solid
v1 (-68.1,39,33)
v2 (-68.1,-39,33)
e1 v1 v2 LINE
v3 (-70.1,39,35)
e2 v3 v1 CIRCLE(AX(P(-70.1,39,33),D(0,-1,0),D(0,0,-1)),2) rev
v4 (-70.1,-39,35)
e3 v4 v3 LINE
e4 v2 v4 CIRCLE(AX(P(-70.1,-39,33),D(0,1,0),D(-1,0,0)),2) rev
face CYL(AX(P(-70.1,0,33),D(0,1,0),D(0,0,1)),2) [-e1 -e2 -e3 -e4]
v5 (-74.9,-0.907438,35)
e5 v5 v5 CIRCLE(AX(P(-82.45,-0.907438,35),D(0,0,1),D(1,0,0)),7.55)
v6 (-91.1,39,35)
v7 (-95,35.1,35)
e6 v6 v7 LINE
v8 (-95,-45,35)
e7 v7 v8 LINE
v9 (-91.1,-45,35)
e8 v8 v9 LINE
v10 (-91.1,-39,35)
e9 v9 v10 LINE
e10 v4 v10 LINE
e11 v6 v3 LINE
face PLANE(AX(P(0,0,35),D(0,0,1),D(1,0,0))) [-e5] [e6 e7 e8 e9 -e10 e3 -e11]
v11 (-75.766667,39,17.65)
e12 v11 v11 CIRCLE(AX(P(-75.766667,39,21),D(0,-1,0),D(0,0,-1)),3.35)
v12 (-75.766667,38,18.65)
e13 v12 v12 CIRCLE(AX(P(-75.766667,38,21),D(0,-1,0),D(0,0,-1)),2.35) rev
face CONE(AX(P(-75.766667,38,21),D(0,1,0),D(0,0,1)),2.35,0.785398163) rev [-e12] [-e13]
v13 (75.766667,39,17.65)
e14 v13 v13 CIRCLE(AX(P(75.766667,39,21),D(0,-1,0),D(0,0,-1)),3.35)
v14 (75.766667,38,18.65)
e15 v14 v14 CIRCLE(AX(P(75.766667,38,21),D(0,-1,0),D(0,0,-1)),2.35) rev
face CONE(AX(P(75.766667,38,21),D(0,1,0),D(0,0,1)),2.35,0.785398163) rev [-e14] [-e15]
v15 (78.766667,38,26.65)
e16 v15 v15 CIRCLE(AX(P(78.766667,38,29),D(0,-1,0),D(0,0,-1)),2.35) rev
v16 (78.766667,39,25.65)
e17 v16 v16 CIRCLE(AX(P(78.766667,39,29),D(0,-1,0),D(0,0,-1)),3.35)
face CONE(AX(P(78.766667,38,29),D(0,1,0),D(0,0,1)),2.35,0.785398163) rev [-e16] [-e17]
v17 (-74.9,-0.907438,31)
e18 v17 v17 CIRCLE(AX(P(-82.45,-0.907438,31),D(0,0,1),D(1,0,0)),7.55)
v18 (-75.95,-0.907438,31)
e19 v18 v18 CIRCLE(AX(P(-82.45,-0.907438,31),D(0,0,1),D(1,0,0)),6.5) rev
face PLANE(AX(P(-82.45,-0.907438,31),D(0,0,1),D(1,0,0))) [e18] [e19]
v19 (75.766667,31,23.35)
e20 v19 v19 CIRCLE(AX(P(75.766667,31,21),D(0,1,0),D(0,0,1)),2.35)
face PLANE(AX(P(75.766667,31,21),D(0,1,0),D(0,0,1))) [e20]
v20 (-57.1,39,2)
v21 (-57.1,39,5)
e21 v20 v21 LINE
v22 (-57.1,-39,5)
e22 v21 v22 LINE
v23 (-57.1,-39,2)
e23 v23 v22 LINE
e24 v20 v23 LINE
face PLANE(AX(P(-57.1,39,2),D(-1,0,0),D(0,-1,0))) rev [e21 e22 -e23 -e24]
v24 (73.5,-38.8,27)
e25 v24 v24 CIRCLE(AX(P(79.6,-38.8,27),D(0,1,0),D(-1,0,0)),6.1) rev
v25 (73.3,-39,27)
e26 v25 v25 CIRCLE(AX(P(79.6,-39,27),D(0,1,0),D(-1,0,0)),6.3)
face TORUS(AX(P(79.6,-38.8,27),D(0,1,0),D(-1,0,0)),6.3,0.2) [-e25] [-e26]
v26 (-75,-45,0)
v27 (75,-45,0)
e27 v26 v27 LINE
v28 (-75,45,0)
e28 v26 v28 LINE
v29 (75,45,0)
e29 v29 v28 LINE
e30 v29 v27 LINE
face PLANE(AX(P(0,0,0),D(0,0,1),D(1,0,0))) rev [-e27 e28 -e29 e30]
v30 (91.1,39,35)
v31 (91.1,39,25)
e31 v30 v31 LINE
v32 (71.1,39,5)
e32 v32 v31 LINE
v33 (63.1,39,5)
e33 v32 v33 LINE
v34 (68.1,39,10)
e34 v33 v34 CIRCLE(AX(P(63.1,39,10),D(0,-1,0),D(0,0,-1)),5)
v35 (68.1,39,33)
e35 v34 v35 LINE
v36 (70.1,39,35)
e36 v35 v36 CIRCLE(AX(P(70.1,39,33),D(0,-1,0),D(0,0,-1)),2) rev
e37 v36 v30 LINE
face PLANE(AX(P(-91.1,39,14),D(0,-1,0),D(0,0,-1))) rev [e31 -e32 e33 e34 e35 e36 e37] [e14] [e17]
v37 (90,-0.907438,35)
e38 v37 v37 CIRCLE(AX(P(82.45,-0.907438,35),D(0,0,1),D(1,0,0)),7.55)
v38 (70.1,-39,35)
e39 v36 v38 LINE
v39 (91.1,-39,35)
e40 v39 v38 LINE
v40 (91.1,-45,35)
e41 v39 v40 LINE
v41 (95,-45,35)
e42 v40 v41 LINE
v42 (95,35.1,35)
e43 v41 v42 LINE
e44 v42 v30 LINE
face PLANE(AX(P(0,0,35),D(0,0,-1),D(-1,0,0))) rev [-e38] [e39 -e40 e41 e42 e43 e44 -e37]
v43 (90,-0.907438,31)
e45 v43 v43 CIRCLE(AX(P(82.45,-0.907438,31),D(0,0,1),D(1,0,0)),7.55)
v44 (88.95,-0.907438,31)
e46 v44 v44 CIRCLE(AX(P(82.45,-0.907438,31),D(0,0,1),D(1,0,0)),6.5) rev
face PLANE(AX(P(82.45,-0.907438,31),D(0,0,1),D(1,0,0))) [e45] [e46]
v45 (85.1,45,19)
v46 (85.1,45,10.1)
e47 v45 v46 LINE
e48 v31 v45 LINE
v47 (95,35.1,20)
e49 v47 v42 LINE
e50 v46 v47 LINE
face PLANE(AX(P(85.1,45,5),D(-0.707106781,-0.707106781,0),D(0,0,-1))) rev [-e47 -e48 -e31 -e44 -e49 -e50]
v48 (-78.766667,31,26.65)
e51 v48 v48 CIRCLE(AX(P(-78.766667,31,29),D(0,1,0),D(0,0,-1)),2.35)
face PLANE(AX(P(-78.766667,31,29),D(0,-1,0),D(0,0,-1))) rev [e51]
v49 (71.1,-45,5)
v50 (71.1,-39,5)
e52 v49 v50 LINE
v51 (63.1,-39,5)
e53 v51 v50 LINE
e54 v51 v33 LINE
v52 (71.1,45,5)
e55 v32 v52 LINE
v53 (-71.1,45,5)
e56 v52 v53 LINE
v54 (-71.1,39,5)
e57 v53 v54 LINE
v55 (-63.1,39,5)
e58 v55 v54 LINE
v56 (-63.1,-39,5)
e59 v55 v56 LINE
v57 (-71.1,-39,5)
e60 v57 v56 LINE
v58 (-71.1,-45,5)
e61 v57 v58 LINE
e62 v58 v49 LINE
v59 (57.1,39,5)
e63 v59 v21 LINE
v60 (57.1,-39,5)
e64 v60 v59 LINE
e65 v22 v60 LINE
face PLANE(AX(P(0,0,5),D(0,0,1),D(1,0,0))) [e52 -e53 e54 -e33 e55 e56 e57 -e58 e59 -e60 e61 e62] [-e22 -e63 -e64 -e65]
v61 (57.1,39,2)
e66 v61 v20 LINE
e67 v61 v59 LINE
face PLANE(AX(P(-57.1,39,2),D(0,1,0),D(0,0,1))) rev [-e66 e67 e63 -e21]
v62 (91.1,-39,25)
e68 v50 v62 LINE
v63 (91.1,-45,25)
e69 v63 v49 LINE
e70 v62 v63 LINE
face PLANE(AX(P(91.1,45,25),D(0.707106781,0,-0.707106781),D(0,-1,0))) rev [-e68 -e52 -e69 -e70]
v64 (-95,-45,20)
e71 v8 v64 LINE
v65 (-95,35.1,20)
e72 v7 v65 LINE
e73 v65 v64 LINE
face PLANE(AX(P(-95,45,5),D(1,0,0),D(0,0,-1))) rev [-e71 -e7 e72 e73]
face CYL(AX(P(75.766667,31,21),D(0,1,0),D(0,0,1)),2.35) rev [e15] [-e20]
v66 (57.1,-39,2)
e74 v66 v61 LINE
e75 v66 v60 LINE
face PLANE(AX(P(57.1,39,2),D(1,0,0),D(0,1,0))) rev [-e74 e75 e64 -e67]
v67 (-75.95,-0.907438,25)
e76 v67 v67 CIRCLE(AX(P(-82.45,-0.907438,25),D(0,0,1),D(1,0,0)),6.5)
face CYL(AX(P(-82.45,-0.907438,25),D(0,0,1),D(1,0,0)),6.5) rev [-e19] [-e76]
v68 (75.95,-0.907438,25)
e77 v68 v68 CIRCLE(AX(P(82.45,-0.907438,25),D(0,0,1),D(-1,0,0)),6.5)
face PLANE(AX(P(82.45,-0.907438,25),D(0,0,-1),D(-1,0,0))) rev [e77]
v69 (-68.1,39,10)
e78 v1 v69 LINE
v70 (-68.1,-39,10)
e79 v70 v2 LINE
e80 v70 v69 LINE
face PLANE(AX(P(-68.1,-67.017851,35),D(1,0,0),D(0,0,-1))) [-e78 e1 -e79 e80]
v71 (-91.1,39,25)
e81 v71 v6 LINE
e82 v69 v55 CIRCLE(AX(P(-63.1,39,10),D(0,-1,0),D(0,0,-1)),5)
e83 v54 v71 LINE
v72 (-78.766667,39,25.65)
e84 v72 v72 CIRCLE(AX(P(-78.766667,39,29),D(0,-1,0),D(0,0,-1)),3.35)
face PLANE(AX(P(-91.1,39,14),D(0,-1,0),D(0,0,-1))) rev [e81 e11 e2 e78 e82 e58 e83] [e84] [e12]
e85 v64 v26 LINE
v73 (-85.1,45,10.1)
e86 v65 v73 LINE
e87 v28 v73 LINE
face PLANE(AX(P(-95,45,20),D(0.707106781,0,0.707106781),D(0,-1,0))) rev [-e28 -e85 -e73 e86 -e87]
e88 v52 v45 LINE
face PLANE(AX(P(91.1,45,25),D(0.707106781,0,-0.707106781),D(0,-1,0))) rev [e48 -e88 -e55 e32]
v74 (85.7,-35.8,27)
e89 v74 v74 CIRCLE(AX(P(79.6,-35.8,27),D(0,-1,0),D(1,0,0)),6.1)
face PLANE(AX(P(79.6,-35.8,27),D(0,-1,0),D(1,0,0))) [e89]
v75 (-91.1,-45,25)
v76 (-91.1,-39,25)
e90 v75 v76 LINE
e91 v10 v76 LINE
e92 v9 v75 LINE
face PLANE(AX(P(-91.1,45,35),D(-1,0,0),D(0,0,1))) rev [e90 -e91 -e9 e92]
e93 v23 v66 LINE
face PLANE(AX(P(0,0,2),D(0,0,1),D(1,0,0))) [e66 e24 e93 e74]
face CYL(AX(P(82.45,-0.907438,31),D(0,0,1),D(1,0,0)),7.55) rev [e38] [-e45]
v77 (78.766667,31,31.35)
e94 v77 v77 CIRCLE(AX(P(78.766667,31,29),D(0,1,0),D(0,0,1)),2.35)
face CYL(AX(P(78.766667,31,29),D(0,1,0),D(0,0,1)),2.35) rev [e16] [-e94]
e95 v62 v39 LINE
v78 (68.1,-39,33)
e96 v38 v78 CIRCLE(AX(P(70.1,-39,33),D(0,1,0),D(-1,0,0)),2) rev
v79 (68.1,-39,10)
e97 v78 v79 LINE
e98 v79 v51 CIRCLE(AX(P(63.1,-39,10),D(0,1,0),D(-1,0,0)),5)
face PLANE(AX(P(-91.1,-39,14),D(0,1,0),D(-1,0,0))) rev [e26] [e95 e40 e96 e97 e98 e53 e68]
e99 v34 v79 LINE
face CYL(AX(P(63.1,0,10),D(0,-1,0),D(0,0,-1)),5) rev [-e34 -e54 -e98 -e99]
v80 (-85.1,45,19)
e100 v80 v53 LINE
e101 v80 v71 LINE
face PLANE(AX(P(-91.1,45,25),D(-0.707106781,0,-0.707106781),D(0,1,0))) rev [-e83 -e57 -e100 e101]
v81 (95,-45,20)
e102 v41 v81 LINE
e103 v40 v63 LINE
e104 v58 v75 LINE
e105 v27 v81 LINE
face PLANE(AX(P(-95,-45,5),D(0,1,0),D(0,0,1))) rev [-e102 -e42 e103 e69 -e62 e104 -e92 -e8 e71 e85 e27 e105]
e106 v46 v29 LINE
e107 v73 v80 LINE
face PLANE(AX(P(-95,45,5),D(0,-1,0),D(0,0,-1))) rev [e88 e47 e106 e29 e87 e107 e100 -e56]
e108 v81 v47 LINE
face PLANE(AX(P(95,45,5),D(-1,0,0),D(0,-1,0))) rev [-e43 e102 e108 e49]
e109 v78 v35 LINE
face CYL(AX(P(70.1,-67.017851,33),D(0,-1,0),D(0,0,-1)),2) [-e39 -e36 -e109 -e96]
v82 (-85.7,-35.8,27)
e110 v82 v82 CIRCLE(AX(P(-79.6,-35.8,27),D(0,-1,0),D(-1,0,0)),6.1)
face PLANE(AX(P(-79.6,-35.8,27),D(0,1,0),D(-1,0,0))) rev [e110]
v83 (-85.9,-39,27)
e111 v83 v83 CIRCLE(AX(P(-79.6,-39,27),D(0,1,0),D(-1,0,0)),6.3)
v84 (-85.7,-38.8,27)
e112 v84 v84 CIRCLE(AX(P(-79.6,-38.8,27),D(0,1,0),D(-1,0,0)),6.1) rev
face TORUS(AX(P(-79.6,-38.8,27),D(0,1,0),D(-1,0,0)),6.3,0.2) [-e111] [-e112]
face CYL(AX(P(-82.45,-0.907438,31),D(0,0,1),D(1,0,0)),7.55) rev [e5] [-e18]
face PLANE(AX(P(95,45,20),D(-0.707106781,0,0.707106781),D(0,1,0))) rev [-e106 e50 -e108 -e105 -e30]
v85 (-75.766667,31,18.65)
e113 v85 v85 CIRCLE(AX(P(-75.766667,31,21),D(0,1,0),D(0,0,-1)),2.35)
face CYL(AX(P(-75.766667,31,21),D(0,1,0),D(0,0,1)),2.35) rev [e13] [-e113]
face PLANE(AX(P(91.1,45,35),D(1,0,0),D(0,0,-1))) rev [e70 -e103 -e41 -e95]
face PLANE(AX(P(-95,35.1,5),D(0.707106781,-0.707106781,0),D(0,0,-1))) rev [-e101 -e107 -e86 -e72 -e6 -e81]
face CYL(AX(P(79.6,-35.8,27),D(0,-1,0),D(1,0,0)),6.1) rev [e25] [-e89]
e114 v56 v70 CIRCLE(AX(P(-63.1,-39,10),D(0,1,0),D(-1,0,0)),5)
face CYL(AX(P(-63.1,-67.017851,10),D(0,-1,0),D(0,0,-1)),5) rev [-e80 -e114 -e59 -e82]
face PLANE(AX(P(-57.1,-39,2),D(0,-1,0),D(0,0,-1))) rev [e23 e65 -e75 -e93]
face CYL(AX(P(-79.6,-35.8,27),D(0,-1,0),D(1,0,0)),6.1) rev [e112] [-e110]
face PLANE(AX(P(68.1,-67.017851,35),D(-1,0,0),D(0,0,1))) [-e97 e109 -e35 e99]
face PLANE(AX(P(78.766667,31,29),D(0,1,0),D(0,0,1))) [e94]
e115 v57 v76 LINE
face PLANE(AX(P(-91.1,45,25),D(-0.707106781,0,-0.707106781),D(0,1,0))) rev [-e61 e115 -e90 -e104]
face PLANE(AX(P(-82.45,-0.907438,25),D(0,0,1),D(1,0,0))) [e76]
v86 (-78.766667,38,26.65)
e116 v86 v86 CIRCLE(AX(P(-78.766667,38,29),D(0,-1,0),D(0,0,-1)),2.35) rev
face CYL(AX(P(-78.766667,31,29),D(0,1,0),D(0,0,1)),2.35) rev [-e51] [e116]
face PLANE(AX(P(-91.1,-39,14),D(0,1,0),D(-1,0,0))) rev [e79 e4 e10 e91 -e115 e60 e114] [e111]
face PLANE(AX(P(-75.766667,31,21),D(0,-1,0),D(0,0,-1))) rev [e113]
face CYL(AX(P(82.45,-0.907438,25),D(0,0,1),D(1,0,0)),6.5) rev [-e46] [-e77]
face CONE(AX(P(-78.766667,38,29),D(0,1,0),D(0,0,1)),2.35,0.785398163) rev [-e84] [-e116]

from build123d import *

# Parameters (mm, degrees)
SKETCH1_W                      = 190
SKETCH1_H                      = 90
BOSS_EXTRUDE1_DEPTH            = 5
SKETCH2_W                      = 3.9
SKETCH2_H                      = 90
BOSS_EXTRUDE2_DEPTH            = 30
SKETCH3_W                      = 34
SKETCH3_H                      = 5
SKETCH3_W_2                    = 47
BOSS_EXTRUDE3_DEPTH            = 90
SKETCH4_W                      = 182.2
SKETCH4_H                      = 6
CUT_EXTRUDE1_DEPTH             = 5
CHAMFER6_SIZE                  = 20
BOSS_EXTRUDE4_DEPTH            = 78
FILLET5_R                      = 2
SKETCH9_R                      = 6.5
CUT_EXTRUDE4_DEPTH             = 10
SKETCH10_R                     = 7.55
CUT_EXTRUDE5_DEPTH             = 4
SKETCH15_R                     = 2.35
CUT_EXTRUDE7_DEPTH             = 8
CHAMFER7_SIZE                  = 1
SKETCH17_R                     = 6.1
CUT_EXTRUDE8_DEPTH             = 3.2
FILLET7_R                      = 0.2
CHAMFER8_SIZE                  = 9.9
CUT_EXTRUDE9_REACH             = 164.433
SKETCH18_W                     = 5
SKETCH18_H                     = 78
CUT_EXTRUDE9_DIRECTION_2_REACH = 164.433
BOSS_EXTRUDE5_DEPTH            = 78
FILLET8_R                      = 5
SKETCH21_W                     = 114.2
SKETCH21_H                     = 78
CUT_EXTRUDE10_DEPTH            = 3


with BuildPart() as part:
    # Sketch1 → Boss-Extrude1 (new body)
    with BuildSketch(Plane.XY):
        Rectangle(SKETCH1_W, SKETCH1_H)
    extrude(amount=BOSS_EXTRUDE1_DEPTH)

    # Sketch2 → Boss-Extrude2 (add)
    with BuildSketch(Plane.XY.offset(5)):
        with Locations((-93.05, 0)):
            Rectangle(SKETCH2_W, SKETCH2_H)
        with Locations((93.05, 0)):
            Rectangle(SKETCH2_W, SKETCH2_H)
    extrude(amount=BOSS_EXTRUDE2_DEPTH)

    # Sketch3 → Boss-Extrude3 (add)
    with BuildSketch(Plane(origin=(0, 45, 0), x_dir=(1, 0, 0), z_dir=(0, 1, 0))):
        with Locations((-74.1, -16.5)):
            Rectangle(SKETCH3_W, SKETCH3_H)
        with Locations((67.6, -16.5)):
            Rectangle(SKETCH3_W_2, SKETCH3_H)
    extrude(amount=-BOSS_EXTRUDE3_DEPTH)

    # Sketch4 → Cut-Extrude1 (cut)
    with BuildSketch(Plane.XY.offset(19)):
        with Locations((0, 42)):
            Rectangle(SKETCH4_W, SKETCH4_H)
        with Locations((0, -42)):
            Rectangle(SKETCH4_W, SKETCH4_H)
    extrude(amount=-CUT_EXTRUDE1_DEPTH, mode=Mode.SUBTRACT)

    # Chamfer6
    # the kernel refuses this chamfer: 20 mm, written as the material it adds along each edge
    with BuildSketch(Plane(origin=(-91.1, 45, 5), x_dir=(0.9996219169112968, 0, -0.02749587661058636), z_dir=(0, -1, 0))) as chamfer6_piece_1:
        Polygon((CHAMFER6_SIZE * 0.999621916911, CHAMFER6_SIZE * 0.0274958766106), (-CHAMFER6_SIZE * 0.0274958766106, CHAMFER6_SIZE * 0.999621916911), (0, 0), align=None)
    extrude(amount=90)
    with BuildSketch(Plane(origin=(91.1, -45, 5), x_dir=(0.027495876610586317, 0, 0.9996219169112968), z_dir=(0, 1, 0))) as chamfer6_piece_2:
        Polygon((CHAMFER6_SIZE * 0.999621916911, -CHAMFER6_SIZE * 0.0274958766106), (-CHAMFER6_SIZE * 0.0274958766106, -CHAMFER6_SIZE * 0.999621916911), (0, 0), align=None)
    extrude(amount=90)
    # the kernel refuses this chamfer: 20 mm, written as the material it takes off along each edge
    with BuildSketch(Plane(origin=(-95, -96.433659759, 0), x_dir=(0.9996219169112968, 0, -0.027495876610586372), z_dir=(0, 1, 0)), Plane(origin=(95, 96.433659759, 0), x_dir=(-0.9996219169112968, 0, -0.027495876610586372), z_dir=(0, -1, 0))) as chamfer6_2_piece_1:
        Polygon((CHAMFER6_SIZE * 0.999621916911, -CHAMFER6_SIZE * 0.0274958766106), (-CHAMFER6_SIZE * 0.0274958766106, -CHAMFER6_SIZE * 0.999621916911), (0, 0), align=None)
    extrude(amount=192.867319519, mode=Mode.SUBTRACT)

    # Sketch7 → Boss-Extrude4 (add)
    with BuildSketch(Plane(origin=(0, 39, 0), x_dir=(1, 0, 0), z_dir=(0, 1, 0))):
        Polygon((-85.1, -19), (-91.1, -25), (-91.1, -35), (-68.1, -35), (-68.1, -19), align=None)
        Polygon((68.1, -35), (68.1, -19), (85.1, -19), (91.1, -25), (91.1, -35), align=None)
    extrude(amount=-BOSS_EXTRUDE4_DEPTH)

    # Fillet5
    fillet5_edges = [part.edges().sort_by_distance(p)[0] for p in [
        (-68.1, 0, 35),
        (68.1, 0, 35),
    ]]
    fillet(fillet5_edges, radius=FILLET5_R)

    # Sketch9 → Cut-Extrude4 (cut)
    with BuildSketch(Plane.XY.offset(35)):
        with Locations((-82.45, -0.90743758)):
            Circle(SKETCH9_R)
        with Locations(Location((82.45, -0.90743758, 0), (0, 0, 180))):
            Circle(SKETCH9_R)
    extrude(amount=-CUT_EXTRUDE4_DEPTH, mode=Mode.SUBTRACT)

    # Sketch10 → Cut-Extrude5 (cut)
    with BuildSketch(Plane.XY.offset(35)):
        with Locations((-82.45, -0.90743758)):
            Circle(SKETCH10_R)
        with Locations((82.45, -0.90743758)):
            Circle(SKETCH10_R)
    extrude(amount=-CUT_EXTRUDE5_DEPTH, mode=Mode.SUBTRACT)

    # Sketch15 → Cut-Extrude7 (cut)
    with BuildSketch(Plane(origin=(0, 39, 0), x_dir=(1, 0, 0), z_dir=(0, 1, 0))):
        with Locations(Location((75.766666667, -21, 0), (0, 0, 270))):
            Circle(SKETCH15_R)
        with Locations(Location((-75.766666667, -21, 0), (0, 0, 90))):
            Circle(SKETCH15_R)
        with Locations(Location((78.766666667, -29, 0), (0, 0, 270))):
            Circle(SKETCH15_R)
        with Locations(Location((-78.766666667, -29, 0), (0, 0, 90))):
            Circle(SKETCH15_R)
    extrude(amount=-CUT_EXTRUDE7_DEPTH, mode=Mode.SUBTRACT)

    # Chamfer7
    chamfer7_edges = [part.edges().sort_by_distance(p)[0] for p in [
        (-75.766666667, 39, 23.35),
        (78.766666667, 39, 26.65),
        (-78.766666667, 39, 31.35),
        (75.766666667, 39, 18.65),
    ]]
    chamfer(chamfer7_edges, length=CHAMFER7_SIZE)

    # Sketch17 → Cut-Extrude8 (cut)
    with BuildSketch(Plane.XZ.offset(39)):
        with Locations((79.6, 27)):
            Circle(SKETCH17_R)
        with Locations(Location((-79.6, 27, 0), (0, 0, 180))):
            Circle(SKETCH17_R)
    extrude(amount=-CUT_EXTRUDE8_DEPTH, mode=Mode.SUBTRACT)

    # Fillet7
    fillet7_edges = [part.edges().sort_by_distance(p)[0] for p in [
        (73.5, -39, 27),
        (-73.5, -39, 27),
    ]]
    fillet(fillet7_edges, radius=FILLET7_R)

    # Chamfer8
    # the kernel refuses this chamfer: 9.9 mm, written as the material it takes off along each edge
    with BuildSketch(Plane(origin=(-95, 45, -5.459661581), x_dir=(0.9996219169112968, 0.027495876610586265, 0), z_dir=(0, 0, 1)), Plane(origin=(95, 45, 60.459661581), x_dir=(-0.9996219169112968, 0.02749587661058615, 0), z_dir=(0, 0, -1))) as chamfer8_piece_1:
        Polygon((CHAMFER8_SIZE * 0.999621916911, -CHAMFER8_SIZE * 0.0274958766106), (-CHAMFER8_SIZE * 0.0274958766106, -CHAMFER8_SIZE * 0.999621916911), (0, 0), align=None)
    extrude(amount=65.919323162, mode=Mode.SUBTRACT)

    # Cut-Extrude9: up to this face of the body (flat: up to its plane)
    cut_extrude9_end = Plane(part.part.faces().sort_by_distance((-68.1, 0, 26))[0])
    # Sketch18 → Cut-Extrude9 (cut, up to the picked face)
    with BuildSketch(Plane(origin=(-57.1, 0, 0), x_dir=(0, 0, -1), z_dir=(1, 0, 0)), mode=Mode.PRIVATE) as cut_extrude9_sk1:
        with Locations((-16.5, 0)):
            Rectangle(SKETCH18_W, SKETCH18_H)
    cut_extrude9_tool1 = split(extrude(cut_extrude9_sk1.sketch, amount=-CUT_EXTRUDE9_REACH, mode=Mode.PRIVATE), bisect_by=cut_extrude9_end, keep=Keep.BOTH, mode=Mode.PRIVATE)
    add(cut_extrude9_tool1.solids().sort_by(Axis((-57.1, 0, 16.5), (-1, 0, 0)))[0], mode=Mode.SUBTRACT)

    # Cut-Extrude9 direction 2: up to this face of the body (flat: up to its plane)
    cut_extrude9_direction_2_end = Plane(part.part.faces().sort_by_distance((68.1, 0, 26))[0])
    # Sketch18 → Cut-Extrude9 direction 2 (cut, up to the picked face)
    with BuildSketch(Plane(origin=(-57.1, 0, 0), x_dir=(0, 0, -1), z_dir=(1, 0, 0)), mode=Mode.PRIVATE) as cut_extrude9_direction_2_sk1:
        with Locations((-16.5, 0)):
            Rectangle(SKETCH18_W, SKETCH18_H)
    cut_extrude9_direction_2_tool1 = split(extrude(cut_extrude9_direction_2_sk1.sketch, amount=CUT_EXTRUDE9_DIRECTION_2_REACH, mode=Mode.PRIVATE), bisect_by=cut_extrude9_direction_2_end, keep=Keep.BOTH, mode=Mode.PRIVATE)
    add(cut_extrude9_direction_2_tool1.solids().sort_by(Axis((-57.1, 0, 16.5), (1, 0, 0)))[0], mode=Mode.SUBTRACT)

    # Sketch20 → Boss-Extrude5 (add)
    with BuildSketch(Plane(origin=(0, 39, 0), x_dir=(1, 0, 0), z_dir=(0, 1, 0))):
        Polygon((-68.1, -14), (-68.1, -5), (-71.1, -5), (-80.1, -14), align=None)
        Polygon((71.1, -5), (80.1, -14), (68.1, -14), (68.1, -5), align=None)
    extrude(amount=-BOSS_EXTRUDE5_DEPTH)

    # Fillet8
    fillet8_edges = [part.edges().sort_by_distance(p)[0] for p in [
        (-68.1, 0, 5),
        (68.1, 0, 5),
    ]]
    fillet(fillet8_edges, radius=FILLET8_R)

    # Sketch21 → Cut-Extrude10 (cut)
    with BuildSketch(Plane.XY.offset(5)):
        Rectangle(SKETCH21_W, SKETCH21_H)
    extrude(amount=-CUT_EXTRUDE10_DEPTH, mode=Mode.SUBTRACT)


solid = part.part
